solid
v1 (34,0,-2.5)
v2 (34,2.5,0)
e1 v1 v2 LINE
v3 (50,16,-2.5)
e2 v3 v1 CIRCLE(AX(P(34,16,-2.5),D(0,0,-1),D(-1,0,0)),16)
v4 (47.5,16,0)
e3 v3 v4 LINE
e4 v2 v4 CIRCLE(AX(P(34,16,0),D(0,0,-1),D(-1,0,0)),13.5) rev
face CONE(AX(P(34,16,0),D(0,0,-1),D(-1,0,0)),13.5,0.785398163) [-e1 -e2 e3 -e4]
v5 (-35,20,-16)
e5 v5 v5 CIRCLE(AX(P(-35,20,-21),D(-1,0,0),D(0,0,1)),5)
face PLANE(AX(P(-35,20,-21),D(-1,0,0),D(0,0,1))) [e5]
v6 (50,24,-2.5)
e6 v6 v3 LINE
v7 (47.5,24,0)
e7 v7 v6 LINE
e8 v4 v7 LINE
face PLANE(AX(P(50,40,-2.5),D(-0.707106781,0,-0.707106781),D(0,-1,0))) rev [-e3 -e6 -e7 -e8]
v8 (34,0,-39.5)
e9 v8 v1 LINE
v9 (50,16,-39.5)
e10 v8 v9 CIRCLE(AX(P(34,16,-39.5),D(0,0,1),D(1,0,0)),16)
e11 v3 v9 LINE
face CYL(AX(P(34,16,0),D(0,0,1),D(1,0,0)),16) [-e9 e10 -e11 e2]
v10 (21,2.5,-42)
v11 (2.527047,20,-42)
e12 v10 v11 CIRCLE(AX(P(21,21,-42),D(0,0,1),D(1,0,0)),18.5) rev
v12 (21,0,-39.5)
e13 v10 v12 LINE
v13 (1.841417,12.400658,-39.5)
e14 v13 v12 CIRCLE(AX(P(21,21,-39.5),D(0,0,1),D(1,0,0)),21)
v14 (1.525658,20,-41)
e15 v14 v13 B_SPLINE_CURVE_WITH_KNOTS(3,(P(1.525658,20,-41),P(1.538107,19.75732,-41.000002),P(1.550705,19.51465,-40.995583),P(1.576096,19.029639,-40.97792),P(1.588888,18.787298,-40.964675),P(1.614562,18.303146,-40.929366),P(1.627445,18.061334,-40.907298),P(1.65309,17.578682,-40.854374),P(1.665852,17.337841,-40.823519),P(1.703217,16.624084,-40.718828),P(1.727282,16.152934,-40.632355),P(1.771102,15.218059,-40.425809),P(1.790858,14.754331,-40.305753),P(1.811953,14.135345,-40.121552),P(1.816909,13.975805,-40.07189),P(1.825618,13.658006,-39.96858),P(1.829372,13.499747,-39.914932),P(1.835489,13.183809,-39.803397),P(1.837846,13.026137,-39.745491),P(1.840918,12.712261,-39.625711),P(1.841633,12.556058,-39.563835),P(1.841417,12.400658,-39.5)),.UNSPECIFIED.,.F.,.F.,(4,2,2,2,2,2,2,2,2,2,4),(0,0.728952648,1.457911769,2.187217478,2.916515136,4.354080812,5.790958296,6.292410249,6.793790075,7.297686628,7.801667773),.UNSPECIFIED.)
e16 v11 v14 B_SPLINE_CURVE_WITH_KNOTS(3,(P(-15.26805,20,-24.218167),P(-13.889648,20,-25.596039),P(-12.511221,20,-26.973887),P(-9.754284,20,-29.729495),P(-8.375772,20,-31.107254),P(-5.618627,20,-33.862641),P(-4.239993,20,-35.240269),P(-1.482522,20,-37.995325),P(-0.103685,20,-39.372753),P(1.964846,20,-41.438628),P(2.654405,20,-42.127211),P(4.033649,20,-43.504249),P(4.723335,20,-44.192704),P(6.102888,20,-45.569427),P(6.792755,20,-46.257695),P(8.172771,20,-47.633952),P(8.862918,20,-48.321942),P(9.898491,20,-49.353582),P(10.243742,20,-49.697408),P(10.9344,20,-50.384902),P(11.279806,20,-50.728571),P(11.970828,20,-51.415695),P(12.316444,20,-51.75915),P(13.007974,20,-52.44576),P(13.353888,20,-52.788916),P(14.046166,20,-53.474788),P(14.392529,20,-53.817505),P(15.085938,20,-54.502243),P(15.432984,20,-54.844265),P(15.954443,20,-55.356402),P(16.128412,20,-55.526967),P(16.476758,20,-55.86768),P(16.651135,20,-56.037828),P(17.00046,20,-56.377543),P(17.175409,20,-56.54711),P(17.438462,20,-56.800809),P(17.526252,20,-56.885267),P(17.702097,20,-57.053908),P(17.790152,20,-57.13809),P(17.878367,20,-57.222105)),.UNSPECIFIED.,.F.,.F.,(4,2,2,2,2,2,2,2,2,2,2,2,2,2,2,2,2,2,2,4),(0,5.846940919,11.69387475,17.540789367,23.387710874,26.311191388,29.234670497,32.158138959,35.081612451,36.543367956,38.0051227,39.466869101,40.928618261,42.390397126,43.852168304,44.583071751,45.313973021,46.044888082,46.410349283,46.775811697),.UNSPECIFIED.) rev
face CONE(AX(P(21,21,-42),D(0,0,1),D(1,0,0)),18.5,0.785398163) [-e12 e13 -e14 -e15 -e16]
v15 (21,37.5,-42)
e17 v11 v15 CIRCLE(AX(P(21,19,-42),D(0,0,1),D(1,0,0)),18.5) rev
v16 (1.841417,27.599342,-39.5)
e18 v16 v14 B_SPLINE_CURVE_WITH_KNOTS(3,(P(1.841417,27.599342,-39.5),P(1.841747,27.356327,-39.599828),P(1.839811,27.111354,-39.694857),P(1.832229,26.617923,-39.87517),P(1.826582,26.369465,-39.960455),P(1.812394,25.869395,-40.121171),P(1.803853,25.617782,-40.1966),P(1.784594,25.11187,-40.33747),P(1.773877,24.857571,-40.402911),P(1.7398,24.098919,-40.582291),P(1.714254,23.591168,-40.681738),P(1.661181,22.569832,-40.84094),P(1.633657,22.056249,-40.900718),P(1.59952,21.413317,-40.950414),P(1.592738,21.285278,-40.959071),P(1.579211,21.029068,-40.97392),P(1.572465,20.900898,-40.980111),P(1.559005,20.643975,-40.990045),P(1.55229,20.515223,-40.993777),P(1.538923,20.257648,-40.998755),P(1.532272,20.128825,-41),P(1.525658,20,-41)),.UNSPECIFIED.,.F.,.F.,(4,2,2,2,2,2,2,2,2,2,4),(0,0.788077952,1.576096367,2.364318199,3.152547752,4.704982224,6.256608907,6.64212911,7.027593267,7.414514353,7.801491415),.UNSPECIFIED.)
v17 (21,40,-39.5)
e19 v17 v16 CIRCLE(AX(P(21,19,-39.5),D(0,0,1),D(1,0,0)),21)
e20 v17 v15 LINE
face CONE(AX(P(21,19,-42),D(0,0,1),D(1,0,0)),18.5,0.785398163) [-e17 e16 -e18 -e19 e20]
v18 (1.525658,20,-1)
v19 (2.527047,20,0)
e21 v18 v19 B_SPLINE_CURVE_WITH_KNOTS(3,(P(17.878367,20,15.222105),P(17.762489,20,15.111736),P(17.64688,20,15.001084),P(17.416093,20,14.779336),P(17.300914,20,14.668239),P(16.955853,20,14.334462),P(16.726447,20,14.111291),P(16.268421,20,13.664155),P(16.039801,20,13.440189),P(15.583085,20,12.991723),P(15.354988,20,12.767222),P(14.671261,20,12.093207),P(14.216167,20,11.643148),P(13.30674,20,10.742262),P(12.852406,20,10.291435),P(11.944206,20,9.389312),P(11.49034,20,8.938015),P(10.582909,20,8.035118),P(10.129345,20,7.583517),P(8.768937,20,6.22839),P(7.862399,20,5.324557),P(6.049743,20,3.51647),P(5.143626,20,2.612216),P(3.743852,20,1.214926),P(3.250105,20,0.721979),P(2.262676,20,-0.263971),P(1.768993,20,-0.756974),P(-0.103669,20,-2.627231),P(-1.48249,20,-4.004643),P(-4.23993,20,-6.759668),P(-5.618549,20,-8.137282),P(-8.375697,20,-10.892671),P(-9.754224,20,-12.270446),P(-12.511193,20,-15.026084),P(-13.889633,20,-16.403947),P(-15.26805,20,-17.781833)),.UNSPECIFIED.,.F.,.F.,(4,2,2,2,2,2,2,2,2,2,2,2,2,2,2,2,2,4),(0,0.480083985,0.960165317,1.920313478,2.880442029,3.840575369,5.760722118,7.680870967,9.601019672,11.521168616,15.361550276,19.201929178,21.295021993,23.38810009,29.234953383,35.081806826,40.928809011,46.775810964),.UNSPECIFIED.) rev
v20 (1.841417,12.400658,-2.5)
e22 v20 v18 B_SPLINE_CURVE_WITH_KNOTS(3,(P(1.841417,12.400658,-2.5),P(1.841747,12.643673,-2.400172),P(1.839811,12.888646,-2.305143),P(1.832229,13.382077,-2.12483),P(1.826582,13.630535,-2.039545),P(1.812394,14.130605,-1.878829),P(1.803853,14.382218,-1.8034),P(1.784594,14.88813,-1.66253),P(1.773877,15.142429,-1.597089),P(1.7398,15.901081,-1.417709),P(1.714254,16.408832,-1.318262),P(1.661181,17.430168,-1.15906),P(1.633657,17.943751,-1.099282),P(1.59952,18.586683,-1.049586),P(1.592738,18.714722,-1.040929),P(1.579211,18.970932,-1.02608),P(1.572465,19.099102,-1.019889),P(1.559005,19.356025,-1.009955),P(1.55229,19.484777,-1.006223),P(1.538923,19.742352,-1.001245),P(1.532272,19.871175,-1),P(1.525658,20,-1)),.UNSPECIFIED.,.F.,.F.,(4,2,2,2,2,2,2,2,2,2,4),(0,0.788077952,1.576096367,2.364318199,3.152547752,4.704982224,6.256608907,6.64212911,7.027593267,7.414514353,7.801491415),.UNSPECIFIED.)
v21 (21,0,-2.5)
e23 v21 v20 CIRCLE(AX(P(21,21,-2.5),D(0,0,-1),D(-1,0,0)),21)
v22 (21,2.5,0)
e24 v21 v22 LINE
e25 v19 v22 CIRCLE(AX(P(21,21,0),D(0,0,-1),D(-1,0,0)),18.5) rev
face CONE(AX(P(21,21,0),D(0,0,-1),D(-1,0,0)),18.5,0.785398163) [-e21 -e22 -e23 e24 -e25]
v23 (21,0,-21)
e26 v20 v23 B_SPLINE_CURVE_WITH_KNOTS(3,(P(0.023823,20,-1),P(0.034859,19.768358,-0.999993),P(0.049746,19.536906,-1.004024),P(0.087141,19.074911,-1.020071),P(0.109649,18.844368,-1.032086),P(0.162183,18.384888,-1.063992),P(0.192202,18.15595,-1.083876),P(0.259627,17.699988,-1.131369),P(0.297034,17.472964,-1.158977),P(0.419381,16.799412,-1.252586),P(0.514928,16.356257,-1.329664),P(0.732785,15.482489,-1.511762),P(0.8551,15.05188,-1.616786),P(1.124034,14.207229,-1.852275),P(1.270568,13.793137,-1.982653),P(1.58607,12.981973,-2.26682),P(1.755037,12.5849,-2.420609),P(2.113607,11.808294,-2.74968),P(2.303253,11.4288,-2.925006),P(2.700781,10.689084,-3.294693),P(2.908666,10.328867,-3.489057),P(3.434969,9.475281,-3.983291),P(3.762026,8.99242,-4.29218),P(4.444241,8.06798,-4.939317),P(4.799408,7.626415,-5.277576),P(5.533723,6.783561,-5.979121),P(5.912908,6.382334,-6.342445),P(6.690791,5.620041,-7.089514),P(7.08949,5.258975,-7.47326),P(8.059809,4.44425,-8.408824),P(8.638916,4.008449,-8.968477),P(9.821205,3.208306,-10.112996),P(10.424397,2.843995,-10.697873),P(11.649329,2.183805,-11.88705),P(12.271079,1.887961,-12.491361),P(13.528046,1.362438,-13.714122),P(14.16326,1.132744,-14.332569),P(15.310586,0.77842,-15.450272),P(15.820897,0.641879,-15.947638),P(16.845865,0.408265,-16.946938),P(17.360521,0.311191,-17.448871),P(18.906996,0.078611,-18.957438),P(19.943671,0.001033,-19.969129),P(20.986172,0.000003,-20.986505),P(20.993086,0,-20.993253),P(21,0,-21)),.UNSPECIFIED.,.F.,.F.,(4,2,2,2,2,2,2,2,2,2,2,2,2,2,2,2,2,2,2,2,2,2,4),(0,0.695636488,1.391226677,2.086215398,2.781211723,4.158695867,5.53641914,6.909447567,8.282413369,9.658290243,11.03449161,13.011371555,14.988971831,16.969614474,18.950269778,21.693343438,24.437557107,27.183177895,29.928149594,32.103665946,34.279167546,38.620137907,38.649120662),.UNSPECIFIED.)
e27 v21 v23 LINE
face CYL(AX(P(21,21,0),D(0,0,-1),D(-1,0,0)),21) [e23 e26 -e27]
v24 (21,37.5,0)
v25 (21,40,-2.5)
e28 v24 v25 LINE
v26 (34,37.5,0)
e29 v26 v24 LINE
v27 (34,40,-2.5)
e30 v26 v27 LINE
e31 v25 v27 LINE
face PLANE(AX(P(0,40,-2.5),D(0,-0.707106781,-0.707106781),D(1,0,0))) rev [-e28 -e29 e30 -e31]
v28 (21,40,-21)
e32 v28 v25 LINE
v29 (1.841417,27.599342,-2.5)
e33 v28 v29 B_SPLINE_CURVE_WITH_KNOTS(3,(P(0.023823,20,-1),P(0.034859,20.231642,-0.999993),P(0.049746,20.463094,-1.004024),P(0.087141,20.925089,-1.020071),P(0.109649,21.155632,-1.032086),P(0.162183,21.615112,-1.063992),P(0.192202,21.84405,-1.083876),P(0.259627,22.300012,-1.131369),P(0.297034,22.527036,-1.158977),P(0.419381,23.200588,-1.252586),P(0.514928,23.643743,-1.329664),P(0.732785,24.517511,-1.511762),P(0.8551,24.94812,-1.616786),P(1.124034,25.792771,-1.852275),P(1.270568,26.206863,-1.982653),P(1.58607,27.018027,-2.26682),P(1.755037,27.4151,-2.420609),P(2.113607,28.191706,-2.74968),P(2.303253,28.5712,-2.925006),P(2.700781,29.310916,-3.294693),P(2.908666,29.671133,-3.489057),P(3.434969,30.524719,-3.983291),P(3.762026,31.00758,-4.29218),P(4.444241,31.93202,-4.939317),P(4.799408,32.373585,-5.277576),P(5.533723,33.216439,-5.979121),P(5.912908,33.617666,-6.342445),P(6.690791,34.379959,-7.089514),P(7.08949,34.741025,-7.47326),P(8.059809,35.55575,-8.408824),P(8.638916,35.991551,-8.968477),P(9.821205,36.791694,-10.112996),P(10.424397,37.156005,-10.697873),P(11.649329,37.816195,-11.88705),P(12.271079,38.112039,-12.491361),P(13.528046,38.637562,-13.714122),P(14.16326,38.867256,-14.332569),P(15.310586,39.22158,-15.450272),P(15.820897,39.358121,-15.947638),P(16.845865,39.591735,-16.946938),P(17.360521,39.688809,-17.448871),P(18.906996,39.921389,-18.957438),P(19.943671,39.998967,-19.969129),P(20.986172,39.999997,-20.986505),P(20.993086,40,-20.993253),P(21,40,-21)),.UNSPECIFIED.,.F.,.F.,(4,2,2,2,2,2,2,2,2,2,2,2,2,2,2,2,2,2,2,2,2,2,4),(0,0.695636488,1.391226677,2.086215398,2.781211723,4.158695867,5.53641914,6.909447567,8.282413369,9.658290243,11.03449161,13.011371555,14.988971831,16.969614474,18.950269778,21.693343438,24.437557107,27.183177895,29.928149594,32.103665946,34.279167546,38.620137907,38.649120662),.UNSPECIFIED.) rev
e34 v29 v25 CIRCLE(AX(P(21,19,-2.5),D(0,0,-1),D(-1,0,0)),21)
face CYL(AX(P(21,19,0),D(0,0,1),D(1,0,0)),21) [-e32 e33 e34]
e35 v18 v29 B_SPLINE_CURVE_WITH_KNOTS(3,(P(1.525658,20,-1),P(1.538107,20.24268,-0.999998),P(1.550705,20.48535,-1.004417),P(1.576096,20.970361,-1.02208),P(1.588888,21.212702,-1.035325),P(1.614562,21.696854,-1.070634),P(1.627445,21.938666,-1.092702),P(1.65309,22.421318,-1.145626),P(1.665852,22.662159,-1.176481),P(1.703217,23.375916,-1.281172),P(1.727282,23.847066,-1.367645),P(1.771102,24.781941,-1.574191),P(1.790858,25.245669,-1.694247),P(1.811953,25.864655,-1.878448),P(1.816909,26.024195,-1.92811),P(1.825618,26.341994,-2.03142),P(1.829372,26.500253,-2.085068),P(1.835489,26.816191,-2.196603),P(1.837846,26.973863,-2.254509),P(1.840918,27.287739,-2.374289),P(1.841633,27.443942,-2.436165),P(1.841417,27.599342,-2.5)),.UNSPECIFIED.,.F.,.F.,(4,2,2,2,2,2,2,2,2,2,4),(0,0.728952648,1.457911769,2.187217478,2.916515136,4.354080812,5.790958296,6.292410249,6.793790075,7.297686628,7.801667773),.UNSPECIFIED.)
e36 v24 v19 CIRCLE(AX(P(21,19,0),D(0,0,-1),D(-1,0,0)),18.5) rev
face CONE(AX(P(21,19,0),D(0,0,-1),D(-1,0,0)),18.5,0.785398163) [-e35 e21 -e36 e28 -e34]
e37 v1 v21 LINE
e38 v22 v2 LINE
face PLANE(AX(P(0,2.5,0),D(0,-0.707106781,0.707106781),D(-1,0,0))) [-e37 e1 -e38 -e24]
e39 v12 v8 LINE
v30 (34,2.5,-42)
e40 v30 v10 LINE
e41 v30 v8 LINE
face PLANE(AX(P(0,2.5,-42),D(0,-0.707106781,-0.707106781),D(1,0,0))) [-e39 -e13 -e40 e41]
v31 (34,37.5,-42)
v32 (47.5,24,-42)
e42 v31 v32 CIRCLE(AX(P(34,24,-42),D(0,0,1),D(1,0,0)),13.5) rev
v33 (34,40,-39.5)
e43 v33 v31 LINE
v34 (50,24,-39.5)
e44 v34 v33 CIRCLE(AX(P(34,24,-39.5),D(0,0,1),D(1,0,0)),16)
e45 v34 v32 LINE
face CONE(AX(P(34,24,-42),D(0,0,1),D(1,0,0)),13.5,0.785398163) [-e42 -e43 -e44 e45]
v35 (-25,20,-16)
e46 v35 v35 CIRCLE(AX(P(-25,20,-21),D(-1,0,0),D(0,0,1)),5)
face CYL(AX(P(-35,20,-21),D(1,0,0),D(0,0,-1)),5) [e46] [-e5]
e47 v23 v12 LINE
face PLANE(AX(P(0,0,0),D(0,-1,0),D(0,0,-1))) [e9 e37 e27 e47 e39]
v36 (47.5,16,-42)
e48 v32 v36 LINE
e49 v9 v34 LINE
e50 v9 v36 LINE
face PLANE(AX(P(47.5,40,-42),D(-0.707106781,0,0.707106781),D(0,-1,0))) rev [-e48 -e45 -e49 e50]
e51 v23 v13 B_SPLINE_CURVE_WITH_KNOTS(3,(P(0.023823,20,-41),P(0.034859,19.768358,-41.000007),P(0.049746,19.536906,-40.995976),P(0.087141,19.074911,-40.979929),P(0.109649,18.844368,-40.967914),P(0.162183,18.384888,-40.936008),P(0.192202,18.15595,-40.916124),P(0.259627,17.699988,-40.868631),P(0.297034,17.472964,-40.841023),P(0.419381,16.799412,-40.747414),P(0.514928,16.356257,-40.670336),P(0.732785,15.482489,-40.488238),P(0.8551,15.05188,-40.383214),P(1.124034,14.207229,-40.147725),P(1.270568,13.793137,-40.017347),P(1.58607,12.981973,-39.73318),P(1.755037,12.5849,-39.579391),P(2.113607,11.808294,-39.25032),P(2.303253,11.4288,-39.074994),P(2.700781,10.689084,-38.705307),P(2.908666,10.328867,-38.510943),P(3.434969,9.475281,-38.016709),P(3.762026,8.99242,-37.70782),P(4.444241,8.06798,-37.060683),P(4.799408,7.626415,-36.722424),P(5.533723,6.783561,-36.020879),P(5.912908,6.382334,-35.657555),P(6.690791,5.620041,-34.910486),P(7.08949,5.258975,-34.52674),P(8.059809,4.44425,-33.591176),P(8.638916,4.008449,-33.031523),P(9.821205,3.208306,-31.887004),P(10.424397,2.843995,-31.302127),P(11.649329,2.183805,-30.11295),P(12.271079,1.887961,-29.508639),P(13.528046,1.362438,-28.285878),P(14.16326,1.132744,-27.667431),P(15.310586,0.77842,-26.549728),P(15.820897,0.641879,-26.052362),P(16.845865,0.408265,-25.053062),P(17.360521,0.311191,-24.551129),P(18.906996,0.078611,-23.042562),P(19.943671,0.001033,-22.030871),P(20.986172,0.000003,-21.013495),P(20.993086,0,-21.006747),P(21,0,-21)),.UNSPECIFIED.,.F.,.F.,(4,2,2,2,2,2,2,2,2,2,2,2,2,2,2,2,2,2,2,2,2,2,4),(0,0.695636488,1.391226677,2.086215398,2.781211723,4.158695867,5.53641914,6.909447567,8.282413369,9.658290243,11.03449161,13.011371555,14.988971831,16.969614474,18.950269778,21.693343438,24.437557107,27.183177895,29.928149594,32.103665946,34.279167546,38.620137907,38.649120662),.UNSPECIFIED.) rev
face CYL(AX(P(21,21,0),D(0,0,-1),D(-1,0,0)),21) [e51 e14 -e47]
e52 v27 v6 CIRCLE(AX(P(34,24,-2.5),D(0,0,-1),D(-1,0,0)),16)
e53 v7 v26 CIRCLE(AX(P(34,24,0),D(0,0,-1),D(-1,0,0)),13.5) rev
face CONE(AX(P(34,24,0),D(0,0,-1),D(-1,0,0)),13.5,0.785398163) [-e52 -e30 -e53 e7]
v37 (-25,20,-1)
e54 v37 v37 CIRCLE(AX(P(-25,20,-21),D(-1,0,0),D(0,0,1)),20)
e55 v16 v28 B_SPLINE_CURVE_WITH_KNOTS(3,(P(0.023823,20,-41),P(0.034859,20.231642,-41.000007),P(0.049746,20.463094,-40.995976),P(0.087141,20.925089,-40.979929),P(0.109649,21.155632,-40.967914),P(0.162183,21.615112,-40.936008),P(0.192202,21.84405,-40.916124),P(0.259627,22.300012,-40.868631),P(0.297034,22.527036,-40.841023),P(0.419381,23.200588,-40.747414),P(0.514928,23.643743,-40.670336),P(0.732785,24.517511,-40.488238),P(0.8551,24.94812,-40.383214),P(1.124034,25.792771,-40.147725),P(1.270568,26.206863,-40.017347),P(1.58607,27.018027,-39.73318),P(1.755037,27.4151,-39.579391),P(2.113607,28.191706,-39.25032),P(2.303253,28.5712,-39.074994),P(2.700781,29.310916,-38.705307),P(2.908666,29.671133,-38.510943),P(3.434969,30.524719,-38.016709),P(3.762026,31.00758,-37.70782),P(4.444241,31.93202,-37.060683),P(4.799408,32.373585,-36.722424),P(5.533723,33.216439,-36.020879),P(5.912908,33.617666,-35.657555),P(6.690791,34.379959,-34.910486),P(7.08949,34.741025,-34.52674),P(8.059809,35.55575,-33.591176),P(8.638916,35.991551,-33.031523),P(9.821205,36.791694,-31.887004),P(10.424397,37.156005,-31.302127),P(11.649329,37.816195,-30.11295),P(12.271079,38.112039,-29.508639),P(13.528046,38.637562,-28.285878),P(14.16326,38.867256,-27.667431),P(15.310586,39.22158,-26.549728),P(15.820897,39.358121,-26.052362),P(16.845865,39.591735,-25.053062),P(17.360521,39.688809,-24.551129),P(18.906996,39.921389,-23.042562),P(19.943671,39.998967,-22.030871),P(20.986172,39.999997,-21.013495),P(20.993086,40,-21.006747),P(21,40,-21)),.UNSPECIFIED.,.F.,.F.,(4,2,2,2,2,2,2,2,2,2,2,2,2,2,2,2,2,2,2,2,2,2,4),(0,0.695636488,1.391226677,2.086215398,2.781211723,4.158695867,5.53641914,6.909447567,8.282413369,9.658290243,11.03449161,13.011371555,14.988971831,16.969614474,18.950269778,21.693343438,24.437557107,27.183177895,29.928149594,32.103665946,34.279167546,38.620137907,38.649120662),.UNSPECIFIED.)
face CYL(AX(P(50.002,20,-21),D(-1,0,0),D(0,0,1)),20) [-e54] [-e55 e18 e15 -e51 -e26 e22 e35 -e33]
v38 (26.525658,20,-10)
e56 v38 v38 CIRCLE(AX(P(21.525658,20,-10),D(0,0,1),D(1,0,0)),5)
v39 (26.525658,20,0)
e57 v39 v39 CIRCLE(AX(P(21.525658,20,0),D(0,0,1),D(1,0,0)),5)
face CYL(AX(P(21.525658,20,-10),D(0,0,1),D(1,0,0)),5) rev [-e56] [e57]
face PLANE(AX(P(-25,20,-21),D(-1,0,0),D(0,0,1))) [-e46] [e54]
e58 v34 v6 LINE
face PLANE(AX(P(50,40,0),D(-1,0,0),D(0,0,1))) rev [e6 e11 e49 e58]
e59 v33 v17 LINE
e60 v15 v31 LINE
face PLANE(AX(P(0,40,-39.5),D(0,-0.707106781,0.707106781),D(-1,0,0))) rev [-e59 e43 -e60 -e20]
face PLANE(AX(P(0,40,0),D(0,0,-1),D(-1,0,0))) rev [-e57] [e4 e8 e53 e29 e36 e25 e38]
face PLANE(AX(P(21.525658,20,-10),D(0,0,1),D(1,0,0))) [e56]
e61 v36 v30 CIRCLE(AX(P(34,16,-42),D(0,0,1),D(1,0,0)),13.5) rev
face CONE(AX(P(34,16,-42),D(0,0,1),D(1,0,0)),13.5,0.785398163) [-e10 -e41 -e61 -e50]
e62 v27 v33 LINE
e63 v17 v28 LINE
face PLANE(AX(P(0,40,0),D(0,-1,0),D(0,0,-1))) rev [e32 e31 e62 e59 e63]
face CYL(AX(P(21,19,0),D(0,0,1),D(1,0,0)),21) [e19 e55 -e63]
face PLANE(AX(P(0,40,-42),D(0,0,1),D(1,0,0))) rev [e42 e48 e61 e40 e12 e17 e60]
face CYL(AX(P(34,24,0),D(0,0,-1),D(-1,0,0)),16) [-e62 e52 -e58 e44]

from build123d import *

# Parameters (mm, degrees)
SKETCH1_W           = 50
SKETCH1_H           = 42
BOSS_EXTRUDE1_DEPTH = 40
FILLET1_R           = 21
FILLET2_R           = 16
BOSS_EXTRUDE2_REACH = 96.81
SKETCH2_R           = 20
CHAMFER1_SIZE       = 2.5
SKETCH3_R           = 5
CUT_EXTRUDE1_DEPTH  = 10
SKETCH4_R           = 5
BOSS_EXTRUDE3_DEPTH = 10


with BuildPart() as part:
    # Sketch1 → Boss-Extrude1 (new body)
    with BuildSketch(Plane(origin=(0, 0, 0), x_dir=(1, 0, 0), z_dir=(0, 1, 0))):
        with Locations((25, 21)):
            Rectangle(SKETCH1_W, SKETCH1_H)
    extrude(amount=BOSS_EXTRUDE1_DEPTH)

    # Fillet1
    # the kernel refuses this fillet: 21 mm, written as the material it takes off along each edge
    with BuildSketch(Plane(origin=(0, 0, -94.5), x_dir=(0, 1, 0), z_dir=(0, 0, 1))) as fillet1_piece_1:
        with BuildLine():
            CenterArc((FILLET1_R, -FILLET1_R), FILLET1_R, 90, 90)
            Line((0, -FILLET1_R), (0, 0))
            Line((0, 0), (FILLET1_R, 0))
        make_face()
    extrude(amount=147, mode=Mode.SUBTRACT)
    with BuildSketch(Plane(origin=(0, 40, -94.5), x_dir=(0, -1, 0), z_dir=(0, 0, 1))) as fillet1_piece_2:
        with BuildLine():
            CenterArc((FILLET1_R, FILLET1_R), FILLET1_R, 180, 90)
            Line((0, FILLET1_R), (0, 0))
            Line((0, 0), (FILLET1_R, 0))
        make_face()
    extrude(amount=147, mode=Mode.SUBTRACT)

    # Fillet2
    fillet2_edges = [part.edges().sort_by_distance(p)[0] for p in [
        (50, 40, -21),
        (50, 0, -21),
    ]]
    fillet(fillet2_edges, radius=FILLET2_R)

    # Sketch2 → Boss-Extrude2 (add, up to next)
    with BuildSketch(Plane.ZY.offset(25), mode=Mode.PRIVATE) as boss_extrude2_sk1:
        with Locations((-21, 20)):
            Circle(SKETCH2_R)
    boss_extrude2_tool1 = extrude(boss_extrude2_sk1.sketch, amount=-BOSS_EXTRUDE2_REACH, mode=Mode.PRIVATE) - part.part
    add(boss_extrude2_tool1.solids().sort_by_distance((-25, 20, -21))[0])

    # Chamfer1
    # the kernel refuses this chamfer: 2.5 mm, written as the material it takes off along each edge
    with BuildSketch(Plane(origin=(21, 40, 0), x_dir=(0, -0.9996219169112968, 0.027495876610586334), z_dir=(1, 0, 0)), Plane(origin=(34, 0, -42), x_dir=(0, -0.027495876610586334, 0.9996219169112968), z_dir=(-1, 0, 0))) as chamfer1_piece_1:
        Polygon((CHAMFER1_SIZE * 0.999621916911, CHAMFER1_SIZE * 0.0274958766106), (-CHAMFER1_SIZE * 0.0274958766106, CHAMFER1_SIZE * 0.999621916911), (0, 0), align=None)
    extrude(amount=13, mode=Mode.SUBTRACT)
    with BuildSketch(Plane(origin=(34, 24, 0), x_dir=(1, 0, 0), z_dir=(0, -1, 0))) as chamfer1_piece_2:
        Polygon((16 - CHAMFER1_SIZE, 0), (16, -CHAMFER1_SIZE), (16, 0), align=None)
    revolve(axis=Axis((34, 24, 0), (0, 0, 1)), revolution_arc=90, mode=Mode.SUBTRACT)
    with BuildSketch(Plane(origin=(21, 19, 0), x_dir=(-0.9667409364669165, -0.25575762307127703, 0), z_dir=(0.25575762307127703, -0.9667409364669165, 0))) as chamfer1_piece_3_section:
        Polygon((21 - CHAMFER1_SIZE, 0), (21, CHAMFER1_SIZE), (21, 0), align=None)
    chamfer1_piece_3 = revolve(axis=Axis((21, 19, 0), (0, 0, -1)), revolution_arc=104.818482505, mode=Mode.PRIVATE)
    chamfer1_piece_3 = chamfer1_piece_3 - Plane(origin=(5.32298007, 20, -21), x_dir=(0, 0, 1), z_dir=(-1, 0, 0)) * Cylinder(20, 85, mode=Mode.PRIVATE)
    add(chamfer1_piece_3, mode=Mode.SUBTRACT)
    with BuildSketch(Plane(origin=(50, 16, 0), x_dir=(-0.9996219169112968, 0, 0.027495876610586334), z_dir=(0, 1, 0)), Plane(origin=(50, 16, -42), x_dir=(0.027495876610587663, 0, 0.9996219169112968), z_dir=(0, 1, 0))) as chamfer1_piece_4:
        Polygon((CHAMFER1_SIZE * 0.999621916911, -CHAMFER1_SIZE * 0.0274958766106), (-CHAMFER1_SIZE * 0.0274958766106, -CHAMFER1_SIZE * 0.999621916911), (0, 0), align=None)
    extrude(amount=8, mode=Mode.SUBTRACT)
    with BuildSketch(Plane(origin=(21, 21, 0), x_dir=(0, -1, 0), z_dir=(1, 0, 0))) as chamfer1_piece_5_section:
        Polygon((21 - CHAMFER1_SIZE, 0), (21, CHAMFER1_SIZE), (21, 0), align=None)
    chamfer1_piece_5 = revolve(axis=Axis((21, 21, 0), (0, 0, -1)), revolution_arc=104.818482505, mode=Mode.PRIVATE)
    chamfer1_piece_5 = chamfer1_piece_5 - Plane(origin=(5.322980064, 20, -21), x_dir=(0, 0, 1), z_dir=(-1, 0, 0)) * Cylinder(20, 84, mode=Mode.PRIVATE)
    add(chamfer1_piece_5, mode=Mode.SUBTRACT)
    with BuildSketch(Plane(origin=(34, 16, 0), x_dir=(0, -1, 0), z_dir=(-1, 0, 0))) as chamfer1_piece_6:
        Polygon((16 - CHAMFER1_SIZE, 0), (16, -CHAMFER1_SIZE), (16, 0), align=None)
    revolve(axis=Axis((34, 16, 0), (0, 0, 1)), revolution_arc=90, mode=Mode.SUBTRACT)
    with BuildSketch(Plane(origin=(21, 0, 0), x_dir=(0, 0.9996219169112968, 0.027495876610586372), z_dir=(1, 0, 0)), Plane(origin=(34, 40, -42), x_dir=(0, 0.027495876610587663, 0.9996219169112968), z_dir=(-1, 0, 0))) as chamfer1_piece_7:
        Polygon((CHAMFER1_SIZE * 0.999621916911, -CHAMFER1_SIZE * 0.0274958766106), (-CHAMFER1_SIZE * 0.0274958766106, -CHAMFER1_SIZE * 0.999621916911), (0, 0), align=None)
    extrude(amount=13, mode=Mode.SUBTRACT)
    with BuildSketch(Plane(origin=(34, 24, -42), x_dir=(1, 0, 0), z_dir=(0, -1, 0))) as chamfer1_piece_8:
        Polygon((16, CHAMFER1_SIZE), (16 - CHAMFER1_SIZE, 0), (16, 0), align=None)
    revolve(axis=Axis((34, 24, -42), (0, 0, 1)), revolution_arc=90, mode=Mode.SUBTRACT)
    with BuildSketch(Plane(origin=(21, 19, -42), x_dir=(-0.9667409364669164, -0.25575762307127753, 0), z_dir=(0.25575762307127753, -0.9667409364669164, 0))) as chamfer1_piece_9_section:
        Polygon((21 - CHAMFER1_SIZE, 0), (21, -CHAMFER1_SIZE), (21, 0), align=None)
    chamfer1_piece_9 = revolve(axis=Axis((21, 19, -42), (0, 0, -1)), revolution_arc=104.818482505, mode=Mode.PRIVATE)
    chamfer1_piece_9 = chamfer1_piece_9 - Plane(origin=(5.322980068, 20, -21), x_dir=(0, 0, 1), z_dir=(-1, 0, 0)) * Cylinder(20, 85, mode=Mode.PRIVATE)
    add(chamfer1_piece_9, mode=Mode.SUBTRACT)
    with BuildSketch(Plane(origin=(34, 16, -42), x_dir=(0, -1, 0), z_dir=(-1, 0, 0))) as chamfer1_piece_10:
        Polygon((16, CHAMFER1_SIZE), (16 - CHAMFER1_SIZE, 0), (16, 0), align=None)
    revolve(axis=Axis((34, 16, -42), (0, 0, 1)), revolution_arc=90, mode=Mode.SUBTRACT)
    with BuildSketch(Plane(origin=(21, 21, -42), x_dir=(0, -1, 0), z_dir=(1, 0, 0))) as chamfer1_piece_11_section:
        Polygon((21 - CHAMFER1_SIZE, 0), (21, -CHAMFER1_SIZE), (21, 0), align=None)
    chamfer1_piece_11 = revolve(axis=Axis((21, 21, -42), (0, 0, -1)), revolution_arc=104.818482505, mode=Mode.PRIVATE)
    chamfer1_piece_11 = chamfer1_piece_11 - Plane(origin=(5.322980065, 20, -21), x_dir=(0, 0, 1), z_dir=(-1, 0, 0)) * Cylinder(20, 84, mode=Mode.PRIVATE)
    add(chamfer1_piece_11, mode=Mode.SUBTRACT)

    # Sketch3 → Cut-Extrude1 (cut)
    with BuildSketch(Plane.XY):
        with Locations((21.525657906, 20)):
            Circle(SKETCH3_R)
    extrude(amount=-CUT_EXTRUDE1_DEPTH, mode=Mode.SUBTRACT)

    # Sketch4 → Boss-Extrude3 (add)
    with BuildSketch(Plane.ZY.offset(25)):
        with Locations((-21, 20)):
            Circle(SKETCH4_R)
    extrude(amount=BOSS_EXTRUDE3_DEPTH)


solid = part.part
